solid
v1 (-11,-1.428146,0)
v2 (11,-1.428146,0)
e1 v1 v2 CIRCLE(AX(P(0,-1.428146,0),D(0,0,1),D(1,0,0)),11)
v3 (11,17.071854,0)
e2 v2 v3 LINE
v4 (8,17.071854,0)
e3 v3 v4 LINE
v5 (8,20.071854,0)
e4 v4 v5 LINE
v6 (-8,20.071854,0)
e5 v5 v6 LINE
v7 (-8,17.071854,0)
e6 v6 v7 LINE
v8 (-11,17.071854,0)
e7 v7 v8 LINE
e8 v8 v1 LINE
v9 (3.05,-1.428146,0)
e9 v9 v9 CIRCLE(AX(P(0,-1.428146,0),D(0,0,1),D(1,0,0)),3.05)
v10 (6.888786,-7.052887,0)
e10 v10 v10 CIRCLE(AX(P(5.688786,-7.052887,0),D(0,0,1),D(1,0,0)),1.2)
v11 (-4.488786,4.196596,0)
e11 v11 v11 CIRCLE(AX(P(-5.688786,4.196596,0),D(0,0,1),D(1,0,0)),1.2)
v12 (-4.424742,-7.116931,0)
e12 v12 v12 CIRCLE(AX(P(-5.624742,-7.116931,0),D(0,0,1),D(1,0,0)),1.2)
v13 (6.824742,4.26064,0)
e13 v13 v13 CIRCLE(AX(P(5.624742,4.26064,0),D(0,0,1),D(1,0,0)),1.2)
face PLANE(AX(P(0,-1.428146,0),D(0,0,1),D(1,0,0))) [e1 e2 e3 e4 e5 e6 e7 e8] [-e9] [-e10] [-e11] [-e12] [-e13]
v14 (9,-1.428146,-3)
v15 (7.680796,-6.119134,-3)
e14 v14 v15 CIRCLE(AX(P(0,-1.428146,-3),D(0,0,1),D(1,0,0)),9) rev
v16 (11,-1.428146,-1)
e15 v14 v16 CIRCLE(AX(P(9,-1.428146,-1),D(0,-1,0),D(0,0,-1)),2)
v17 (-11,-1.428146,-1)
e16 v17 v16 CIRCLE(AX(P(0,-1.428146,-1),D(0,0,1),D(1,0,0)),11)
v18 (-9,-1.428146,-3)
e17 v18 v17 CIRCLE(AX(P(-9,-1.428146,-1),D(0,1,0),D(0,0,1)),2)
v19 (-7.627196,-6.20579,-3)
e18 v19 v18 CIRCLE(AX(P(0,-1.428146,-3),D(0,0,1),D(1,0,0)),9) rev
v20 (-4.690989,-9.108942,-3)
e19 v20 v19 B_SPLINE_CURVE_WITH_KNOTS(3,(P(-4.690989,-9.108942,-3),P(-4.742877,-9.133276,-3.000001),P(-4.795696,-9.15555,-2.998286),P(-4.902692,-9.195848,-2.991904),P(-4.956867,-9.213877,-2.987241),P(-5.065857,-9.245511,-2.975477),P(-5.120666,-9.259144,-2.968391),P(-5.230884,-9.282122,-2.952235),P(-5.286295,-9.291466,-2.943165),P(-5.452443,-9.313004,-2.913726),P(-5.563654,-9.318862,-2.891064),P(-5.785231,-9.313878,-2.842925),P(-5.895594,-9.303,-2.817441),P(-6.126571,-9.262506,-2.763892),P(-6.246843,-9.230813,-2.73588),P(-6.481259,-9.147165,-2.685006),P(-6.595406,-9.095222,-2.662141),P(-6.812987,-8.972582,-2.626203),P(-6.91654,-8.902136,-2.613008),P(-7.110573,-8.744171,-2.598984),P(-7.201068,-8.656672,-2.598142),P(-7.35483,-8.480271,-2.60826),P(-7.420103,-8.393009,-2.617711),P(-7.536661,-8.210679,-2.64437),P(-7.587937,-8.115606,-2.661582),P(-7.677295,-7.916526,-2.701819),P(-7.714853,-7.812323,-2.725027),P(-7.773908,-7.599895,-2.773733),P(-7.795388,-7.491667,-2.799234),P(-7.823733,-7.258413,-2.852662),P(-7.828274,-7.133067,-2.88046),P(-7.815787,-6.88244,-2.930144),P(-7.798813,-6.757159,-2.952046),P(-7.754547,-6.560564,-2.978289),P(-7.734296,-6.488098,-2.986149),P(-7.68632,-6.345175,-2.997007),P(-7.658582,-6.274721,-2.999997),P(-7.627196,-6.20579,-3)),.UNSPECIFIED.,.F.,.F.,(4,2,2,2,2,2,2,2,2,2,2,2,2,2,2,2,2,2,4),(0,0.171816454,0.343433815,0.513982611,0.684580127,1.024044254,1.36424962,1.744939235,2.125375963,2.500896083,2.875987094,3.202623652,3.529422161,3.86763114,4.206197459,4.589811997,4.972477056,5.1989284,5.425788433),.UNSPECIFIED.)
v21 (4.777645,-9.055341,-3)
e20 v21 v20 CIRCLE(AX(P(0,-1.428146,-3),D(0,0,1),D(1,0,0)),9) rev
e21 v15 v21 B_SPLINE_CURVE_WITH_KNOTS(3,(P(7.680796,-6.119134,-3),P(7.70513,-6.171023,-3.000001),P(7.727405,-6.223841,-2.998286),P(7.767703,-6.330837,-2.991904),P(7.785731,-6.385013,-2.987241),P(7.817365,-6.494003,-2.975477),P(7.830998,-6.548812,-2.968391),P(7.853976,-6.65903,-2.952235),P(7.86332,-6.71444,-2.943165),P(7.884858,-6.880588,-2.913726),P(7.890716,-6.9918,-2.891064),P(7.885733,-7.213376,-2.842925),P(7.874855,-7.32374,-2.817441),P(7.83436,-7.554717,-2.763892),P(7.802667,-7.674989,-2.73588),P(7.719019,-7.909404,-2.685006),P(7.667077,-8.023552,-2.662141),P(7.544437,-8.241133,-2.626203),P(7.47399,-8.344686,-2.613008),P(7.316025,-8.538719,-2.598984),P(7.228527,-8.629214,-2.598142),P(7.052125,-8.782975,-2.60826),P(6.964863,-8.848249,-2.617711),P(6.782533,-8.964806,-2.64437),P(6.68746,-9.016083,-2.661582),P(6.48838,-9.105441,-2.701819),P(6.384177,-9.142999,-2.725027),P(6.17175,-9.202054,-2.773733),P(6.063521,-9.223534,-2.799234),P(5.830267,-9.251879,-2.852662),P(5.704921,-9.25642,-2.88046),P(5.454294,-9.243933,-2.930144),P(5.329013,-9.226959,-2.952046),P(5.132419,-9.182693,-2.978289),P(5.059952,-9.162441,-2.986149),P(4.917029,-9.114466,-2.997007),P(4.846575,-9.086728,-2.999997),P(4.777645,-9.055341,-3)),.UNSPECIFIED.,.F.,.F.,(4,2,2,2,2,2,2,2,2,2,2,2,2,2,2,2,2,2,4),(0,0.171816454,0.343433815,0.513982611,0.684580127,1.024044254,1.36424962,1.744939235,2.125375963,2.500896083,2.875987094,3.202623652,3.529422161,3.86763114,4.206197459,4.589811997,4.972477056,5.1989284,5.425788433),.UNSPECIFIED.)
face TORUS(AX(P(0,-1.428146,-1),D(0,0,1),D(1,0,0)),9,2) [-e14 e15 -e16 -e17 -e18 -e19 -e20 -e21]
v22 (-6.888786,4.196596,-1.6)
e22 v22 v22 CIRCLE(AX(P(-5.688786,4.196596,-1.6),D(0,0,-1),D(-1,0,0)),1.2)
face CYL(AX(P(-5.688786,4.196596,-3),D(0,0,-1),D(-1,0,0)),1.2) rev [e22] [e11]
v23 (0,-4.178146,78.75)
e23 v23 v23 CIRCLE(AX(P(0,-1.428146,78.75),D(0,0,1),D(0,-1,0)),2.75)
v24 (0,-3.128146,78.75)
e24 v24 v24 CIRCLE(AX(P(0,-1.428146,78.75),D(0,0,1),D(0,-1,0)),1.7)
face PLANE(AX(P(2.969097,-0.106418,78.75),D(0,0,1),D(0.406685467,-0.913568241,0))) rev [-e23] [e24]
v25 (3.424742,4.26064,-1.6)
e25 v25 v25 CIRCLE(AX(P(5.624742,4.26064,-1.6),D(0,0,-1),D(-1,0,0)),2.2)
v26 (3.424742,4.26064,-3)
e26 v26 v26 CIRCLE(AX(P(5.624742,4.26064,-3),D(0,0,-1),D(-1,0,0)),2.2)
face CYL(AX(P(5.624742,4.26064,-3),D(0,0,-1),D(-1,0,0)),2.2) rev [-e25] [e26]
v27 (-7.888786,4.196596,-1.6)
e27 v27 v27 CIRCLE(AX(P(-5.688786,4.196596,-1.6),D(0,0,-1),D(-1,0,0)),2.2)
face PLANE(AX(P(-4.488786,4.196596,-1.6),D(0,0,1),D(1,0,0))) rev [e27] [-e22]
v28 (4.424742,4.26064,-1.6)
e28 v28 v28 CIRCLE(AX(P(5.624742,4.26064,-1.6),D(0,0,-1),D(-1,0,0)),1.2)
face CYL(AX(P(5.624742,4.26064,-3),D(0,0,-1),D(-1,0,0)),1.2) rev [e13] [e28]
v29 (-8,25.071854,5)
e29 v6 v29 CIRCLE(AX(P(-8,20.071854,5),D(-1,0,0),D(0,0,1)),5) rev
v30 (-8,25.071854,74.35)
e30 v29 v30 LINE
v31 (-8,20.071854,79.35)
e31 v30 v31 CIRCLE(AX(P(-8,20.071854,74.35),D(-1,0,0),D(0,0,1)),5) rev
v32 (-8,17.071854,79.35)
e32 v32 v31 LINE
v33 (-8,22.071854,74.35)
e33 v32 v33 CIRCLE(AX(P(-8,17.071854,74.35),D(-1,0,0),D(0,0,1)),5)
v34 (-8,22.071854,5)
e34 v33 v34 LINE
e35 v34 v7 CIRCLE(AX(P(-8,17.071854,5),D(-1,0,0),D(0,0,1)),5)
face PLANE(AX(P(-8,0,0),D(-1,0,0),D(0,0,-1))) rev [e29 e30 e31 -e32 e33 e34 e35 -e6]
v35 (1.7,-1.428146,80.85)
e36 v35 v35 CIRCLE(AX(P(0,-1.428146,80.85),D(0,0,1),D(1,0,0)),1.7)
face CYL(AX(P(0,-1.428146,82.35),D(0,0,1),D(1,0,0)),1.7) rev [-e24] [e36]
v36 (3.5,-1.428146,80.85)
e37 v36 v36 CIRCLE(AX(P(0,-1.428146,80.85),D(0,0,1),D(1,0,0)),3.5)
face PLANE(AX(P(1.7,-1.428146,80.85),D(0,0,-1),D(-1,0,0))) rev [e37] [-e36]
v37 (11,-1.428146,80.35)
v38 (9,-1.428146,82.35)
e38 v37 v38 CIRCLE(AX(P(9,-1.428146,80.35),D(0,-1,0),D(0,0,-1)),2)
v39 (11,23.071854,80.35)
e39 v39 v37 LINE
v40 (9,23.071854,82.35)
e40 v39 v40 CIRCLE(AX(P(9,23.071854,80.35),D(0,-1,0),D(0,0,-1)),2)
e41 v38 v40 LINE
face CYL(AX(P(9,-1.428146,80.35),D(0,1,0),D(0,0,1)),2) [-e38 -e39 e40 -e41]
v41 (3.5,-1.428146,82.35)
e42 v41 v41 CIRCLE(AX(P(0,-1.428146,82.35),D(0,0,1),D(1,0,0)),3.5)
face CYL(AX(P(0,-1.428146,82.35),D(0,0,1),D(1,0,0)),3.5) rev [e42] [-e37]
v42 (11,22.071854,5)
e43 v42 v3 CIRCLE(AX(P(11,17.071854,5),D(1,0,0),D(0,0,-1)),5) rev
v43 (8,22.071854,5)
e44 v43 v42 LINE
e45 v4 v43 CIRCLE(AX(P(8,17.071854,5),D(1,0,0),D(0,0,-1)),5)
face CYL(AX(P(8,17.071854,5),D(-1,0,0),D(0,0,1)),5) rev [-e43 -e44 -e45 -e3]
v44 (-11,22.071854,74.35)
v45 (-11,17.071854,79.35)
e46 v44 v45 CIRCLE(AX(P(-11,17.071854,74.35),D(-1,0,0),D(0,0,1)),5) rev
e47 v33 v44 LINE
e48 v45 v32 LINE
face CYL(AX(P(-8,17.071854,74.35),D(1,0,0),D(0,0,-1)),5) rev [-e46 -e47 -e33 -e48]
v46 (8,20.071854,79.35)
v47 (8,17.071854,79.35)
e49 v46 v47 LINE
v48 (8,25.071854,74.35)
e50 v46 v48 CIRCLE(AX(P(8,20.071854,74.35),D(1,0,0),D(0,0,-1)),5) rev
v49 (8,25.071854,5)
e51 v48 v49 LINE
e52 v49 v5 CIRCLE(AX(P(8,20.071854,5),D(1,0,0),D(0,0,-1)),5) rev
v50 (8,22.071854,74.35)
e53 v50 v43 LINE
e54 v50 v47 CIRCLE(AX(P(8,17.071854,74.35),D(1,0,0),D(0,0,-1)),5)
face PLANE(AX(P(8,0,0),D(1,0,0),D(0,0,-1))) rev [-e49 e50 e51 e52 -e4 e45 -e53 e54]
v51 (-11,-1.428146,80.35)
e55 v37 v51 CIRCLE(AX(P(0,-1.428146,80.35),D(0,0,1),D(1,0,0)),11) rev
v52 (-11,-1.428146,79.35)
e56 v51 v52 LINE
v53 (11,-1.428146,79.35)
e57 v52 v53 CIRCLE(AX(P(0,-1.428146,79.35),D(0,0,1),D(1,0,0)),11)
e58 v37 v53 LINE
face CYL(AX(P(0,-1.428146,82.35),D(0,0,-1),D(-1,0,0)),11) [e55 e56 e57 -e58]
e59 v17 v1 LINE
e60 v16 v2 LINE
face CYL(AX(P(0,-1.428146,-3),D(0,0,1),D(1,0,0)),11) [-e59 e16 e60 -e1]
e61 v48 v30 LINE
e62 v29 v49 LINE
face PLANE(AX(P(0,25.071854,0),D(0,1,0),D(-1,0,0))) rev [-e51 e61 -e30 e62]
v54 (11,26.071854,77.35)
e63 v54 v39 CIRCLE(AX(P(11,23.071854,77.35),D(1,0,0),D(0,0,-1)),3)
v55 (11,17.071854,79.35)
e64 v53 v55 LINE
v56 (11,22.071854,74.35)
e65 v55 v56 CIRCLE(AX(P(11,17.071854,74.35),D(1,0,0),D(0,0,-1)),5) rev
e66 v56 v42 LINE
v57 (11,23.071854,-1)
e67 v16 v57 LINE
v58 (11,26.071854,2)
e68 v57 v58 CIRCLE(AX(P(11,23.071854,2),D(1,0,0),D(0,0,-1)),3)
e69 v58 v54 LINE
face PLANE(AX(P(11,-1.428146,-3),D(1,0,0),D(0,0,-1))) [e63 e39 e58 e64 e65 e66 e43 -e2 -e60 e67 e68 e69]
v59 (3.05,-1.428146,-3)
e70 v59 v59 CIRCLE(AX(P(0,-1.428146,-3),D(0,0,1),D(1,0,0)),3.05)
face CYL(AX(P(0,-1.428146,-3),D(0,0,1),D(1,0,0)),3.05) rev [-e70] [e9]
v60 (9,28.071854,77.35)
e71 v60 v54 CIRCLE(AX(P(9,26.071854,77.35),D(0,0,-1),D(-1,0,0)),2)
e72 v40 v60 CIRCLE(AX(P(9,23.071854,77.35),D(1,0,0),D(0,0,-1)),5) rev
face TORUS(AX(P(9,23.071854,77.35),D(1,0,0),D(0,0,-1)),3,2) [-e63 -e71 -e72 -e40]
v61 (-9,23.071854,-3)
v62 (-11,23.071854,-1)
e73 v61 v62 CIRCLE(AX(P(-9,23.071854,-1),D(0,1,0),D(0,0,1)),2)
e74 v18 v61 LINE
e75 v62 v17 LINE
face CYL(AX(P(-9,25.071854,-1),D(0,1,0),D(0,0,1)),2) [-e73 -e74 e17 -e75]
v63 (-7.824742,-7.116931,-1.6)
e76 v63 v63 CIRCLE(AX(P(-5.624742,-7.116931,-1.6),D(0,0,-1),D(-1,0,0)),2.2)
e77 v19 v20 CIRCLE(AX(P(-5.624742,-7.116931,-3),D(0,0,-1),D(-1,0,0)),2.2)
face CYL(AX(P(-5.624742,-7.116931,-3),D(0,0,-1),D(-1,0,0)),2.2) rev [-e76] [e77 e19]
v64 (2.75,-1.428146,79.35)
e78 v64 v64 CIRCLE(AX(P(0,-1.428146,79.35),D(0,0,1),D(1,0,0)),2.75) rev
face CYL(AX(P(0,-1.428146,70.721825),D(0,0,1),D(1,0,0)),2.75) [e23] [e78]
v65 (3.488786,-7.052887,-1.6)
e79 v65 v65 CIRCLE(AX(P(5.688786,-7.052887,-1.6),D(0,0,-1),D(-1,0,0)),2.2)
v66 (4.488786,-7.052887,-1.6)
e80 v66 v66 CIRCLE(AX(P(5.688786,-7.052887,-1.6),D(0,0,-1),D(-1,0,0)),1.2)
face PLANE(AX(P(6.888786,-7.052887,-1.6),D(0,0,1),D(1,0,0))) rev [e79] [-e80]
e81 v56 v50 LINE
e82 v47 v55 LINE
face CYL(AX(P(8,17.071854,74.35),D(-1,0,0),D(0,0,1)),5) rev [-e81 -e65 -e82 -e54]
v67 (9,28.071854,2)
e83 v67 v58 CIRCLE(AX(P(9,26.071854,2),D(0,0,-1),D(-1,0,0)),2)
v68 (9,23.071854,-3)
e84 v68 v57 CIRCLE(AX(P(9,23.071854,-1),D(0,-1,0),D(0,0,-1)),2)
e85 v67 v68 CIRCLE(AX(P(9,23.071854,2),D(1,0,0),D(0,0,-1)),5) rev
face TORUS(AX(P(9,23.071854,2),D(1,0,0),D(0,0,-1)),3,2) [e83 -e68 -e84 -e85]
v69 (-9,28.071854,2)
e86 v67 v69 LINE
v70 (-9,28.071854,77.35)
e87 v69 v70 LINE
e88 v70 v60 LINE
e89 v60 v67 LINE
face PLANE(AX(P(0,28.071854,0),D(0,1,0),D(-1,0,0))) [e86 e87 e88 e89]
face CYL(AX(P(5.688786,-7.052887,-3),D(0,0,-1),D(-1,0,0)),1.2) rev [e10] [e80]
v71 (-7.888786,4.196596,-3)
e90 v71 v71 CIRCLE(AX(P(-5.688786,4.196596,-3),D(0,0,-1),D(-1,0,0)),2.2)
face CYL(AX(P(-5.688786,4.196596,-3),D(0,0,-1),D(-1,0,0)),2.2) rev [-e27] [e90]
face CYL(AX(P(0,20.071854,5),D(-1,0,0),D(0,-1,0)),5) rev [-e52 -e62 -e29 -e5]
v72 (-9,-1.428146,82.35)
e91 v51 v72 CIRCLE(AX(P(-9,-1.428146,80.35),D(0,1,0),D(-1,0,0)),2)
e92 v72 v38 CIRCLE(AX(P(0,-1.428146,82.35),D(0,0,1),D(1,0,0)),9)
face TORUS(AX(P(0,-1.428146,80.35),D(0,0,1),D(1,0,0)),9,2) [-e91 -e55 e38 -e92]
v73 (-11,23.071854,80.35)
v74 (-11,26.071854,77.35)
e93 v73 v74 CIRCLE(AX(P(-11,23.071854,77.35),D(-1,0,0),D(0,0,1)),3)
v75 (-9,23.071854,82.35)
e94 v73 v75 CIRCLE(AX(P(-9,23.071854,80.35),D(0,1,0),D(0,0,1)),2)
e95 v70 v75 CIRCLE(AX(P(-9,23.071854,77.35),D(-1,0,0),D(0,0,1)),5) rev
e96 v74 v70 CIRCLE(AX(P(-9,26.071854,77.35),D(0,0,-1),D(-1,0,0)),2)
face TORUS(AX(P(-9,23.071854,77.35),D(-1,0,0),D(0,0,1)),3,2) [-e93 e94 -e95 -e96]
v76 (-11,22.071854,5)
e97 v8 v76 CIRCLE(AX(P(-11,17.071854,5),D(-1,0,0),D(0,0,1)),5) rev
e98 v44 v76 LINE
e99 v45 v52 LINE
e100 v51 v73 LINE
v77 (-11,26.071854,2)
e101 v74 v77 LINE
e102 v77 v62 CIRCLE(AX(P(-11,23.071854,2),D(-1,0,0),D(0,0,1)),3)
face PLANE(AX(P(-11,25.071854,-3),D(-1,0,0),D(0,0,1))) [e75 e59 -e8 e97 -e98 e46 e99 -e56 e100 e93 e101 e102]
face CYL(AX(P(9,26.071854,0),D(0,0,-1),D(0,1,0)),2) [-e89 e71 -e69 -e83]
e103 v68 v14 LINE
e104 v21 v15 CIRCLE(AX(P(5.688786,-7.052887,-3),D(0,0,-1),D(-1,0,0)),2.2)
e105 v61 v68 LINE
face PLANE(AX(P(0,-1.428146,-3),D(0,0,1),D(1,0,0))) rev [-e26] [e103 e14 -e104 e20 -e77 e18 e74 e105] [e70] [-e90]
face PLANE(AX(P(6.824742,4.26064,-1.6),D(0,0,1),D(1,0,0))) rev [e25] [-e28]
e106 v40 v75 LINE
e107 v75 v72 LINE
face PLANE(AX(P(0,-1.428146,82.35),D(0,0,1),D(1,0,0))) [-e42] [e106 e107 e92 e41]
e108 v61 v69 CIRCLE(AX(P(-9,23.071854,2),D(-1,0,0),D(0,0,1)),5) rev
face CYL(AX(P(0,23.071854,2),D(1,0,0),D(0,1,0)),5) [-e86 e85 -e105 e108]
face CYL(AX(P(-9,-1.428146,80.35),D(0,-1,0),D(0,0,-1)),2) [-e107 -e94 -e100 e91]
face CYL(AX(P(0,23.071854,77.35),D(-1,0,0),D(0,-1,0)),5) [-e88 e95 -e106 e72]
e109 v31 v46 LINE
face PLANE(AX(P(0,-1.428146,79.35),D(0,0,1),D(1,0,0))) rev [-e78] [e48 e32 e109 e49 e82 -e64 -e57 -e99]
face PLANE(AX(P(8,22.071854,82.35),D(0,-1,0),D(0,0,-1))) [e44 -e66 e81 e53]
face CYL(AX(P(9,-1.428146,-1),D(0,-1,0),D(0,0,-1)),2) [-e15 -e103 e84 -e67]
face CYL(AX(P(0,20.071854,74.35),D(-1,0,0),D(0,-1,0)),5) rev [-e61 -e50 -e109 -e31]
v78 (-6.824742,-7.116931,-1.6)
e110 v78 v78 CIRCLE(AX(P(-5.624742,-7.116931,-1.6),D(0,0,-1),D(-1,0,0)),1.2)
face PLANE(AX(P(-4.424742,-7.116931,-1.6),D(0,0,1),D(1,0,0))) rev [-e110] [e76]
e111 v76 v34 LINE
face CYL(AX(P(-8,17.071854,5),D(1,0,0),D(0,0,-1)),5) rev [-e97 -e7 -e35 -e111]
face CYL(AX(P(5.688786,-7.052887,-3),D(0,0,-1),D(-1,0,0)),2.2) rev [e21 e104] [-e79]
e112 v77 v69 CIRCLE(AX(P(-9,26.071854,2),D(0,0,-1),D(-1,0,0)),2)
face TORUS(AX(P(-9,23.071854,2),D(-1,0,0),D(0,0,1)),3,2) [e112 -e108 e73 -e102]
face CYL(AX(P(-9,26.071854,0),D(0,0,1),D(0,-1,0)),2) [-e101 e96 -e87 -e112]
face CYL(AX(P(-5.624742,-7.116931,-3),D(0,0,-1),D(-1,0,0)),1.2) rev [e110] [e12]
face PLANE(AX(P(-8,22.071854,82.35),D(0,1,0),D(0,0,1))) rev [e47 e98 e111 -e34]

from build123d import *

# Parameters (mm, degrees)
ESBO_O1_R                                            = 3.05
RESSALTO_EXTRUS_O1_DEPTH                             = 3
ESBO_O2_W                                            = 22
ESBO_O2_H                                            = 82.35
RESSALTO_EXTRUS_O2_DEPTH                             = 3
RESSALTO_EXTRUS_O3_START                             = 3
RESSALTO_EXTRUS_O3_DEPTH                             = 3
ESBO_O6_W                                            = 85.35
ESBO_O6_H                                            = 6
RESSALTO_EXTRUS_O5_DEPTH                             = 3
ESBO_O7_R                                            = 2.75
RESSALTO_EXTRUS_O6_DEPTH                             = 0.6
REBAIXO_PARA_PARAFUSO_COM_CABE_A_PANELA_D            = 3.4
REBAIXO_PARA_PARAFUSO_COM_CABE_A_PANELA_CBORE_D      = 7
REBAIXO_PARA_PARAFUSO_COM_CABE_A_PANELA_CBORE_DEPTH  = 1.5
REBAIXO_PARA_PARAFUSO_COM_CABE_A_REDONDA_D           = 2.4
REBAIXO_PARA_PARAFUSO_COM_CABE_A_REDONDA_DEPTH       = 3
REBAIXO_PARA_PARAFUSO_COM_CABE_A_REDONDA_CBORE_D     = 4.4
REBAIXO_PARA_PARAFUSO_COM_CABE_A_REDONDA_CBORE_DEPTH = 1.4
PADR_OCIRCULAR1_COUNT                                = 4
FILETE1_R                                            = 5
FILETE2_R                                            = 5
FILETE3_R                                            = 2


with BuildPart() as part:
    # Esboço1 → Ressalto-extrusão1 (new body)
    with BuildSketch(Plane.XY):
        with BuildLine():
            Line((11, -1.428145739), (11, 25.071854261))
            Line((11, 25.071854261), (-11, 25.071854261))
            Line((-11, 25.071854261), (-11, -1.428145739))
            ThreePointArc((-11, -1.428145739), (0, -12.428145739), (11, -1.428145739))
        make_face()
        with Locations((0, -1.428145739)):
            Circle(ESBO_O1_R, mode=Mode.SUBTRACT)
    extrude(amount=-RESSALTO_EXTRUS_O1_DEPTH)

    # Esboço2 → Ressalto-extrusão2 (add)
    with BuildSketch(Plane(origin=(0, 25.071854261, 0), x_dir=(1, 0, 0), z_dir=(0, 1, 0))):
        with Locations((0, -38.175)):
            Rectangle(ESBO_O2_W, ESBO_O2_H)
    extrude(amount=RESSALTO_EXTRUS_O2_DEPTH)

    # Esboço3 → Ressalto-extrusão3 (add)
    with BuildSketch(Plane.XY.offset(79.35).offset(RESSALTO_EXTRUS_O3_START)):
        with BuildLine():
            Line((11, 28.071854261), (-11, 28.071854261))
            Line((-11, 28.071854261), (-11, -1.428145739))
            ThreePointArc((-11, -1.428145739), (0, -12.428145739), (11, -1.428145739))
            Line((11, -1.428145739), (11, 28.071854261))
        make_face()
    extrude(amount=-RESSALTO_EXTRUS_O3_DEPTH)

    # Esboço6 → Ressalto-extrusão5 (add)
    with BuildSketch(Plane(origin=(11, 0, 0), x_dir=(0, 0, -1), z_dir=(1, 0, 0))):
        with Locations((-39.675, 25.071854261)):
            Rectangle(ESBO_O6_W, ESBO_O6_H)
    ressalto_extrus_o5 = extrude(amount=-RESSALTO_EXTRUS_O5_DEPTH)

    # Espelhar1: Ressalto-extrusão5 across plane
    add(ressalto_extrus_o5.mirror(Plane(origin=(0, 0, 0), x_dir=(0, 0, 1), z_dir=(1, 0, 0))))

    # Esboço7 → Ressalto-extrusão6 (add)
    with BuildSketch(Plane(origin=(0, 0, 79.35), x_dir=(-1, 0, 0), z_dir=(0, 0, -1))):
        with Locations(Location((0, -1.428145739, 0), (0, 0, 180))):
            Circle(ESBO_O7_R)
    extrude(amount=RESSALTO_EXTRUS_O6_DEPTH)

    # Rebaixo para parafuso com cabeça panela de M31 (through all)
    with Locations(Plane.XY.offset(82.35)):
        with Locations((0, -1.428145739)):
            CounterBoreHole(REBAIXO_PARA_PARAFUSO_COM_CABE_A_PANELA_D / 2, REBAIXO_PARA_PARAFUSO_COM_CABE_A_PANELA_CBORE_D / 2, REBAIXO_PARA_PARAFUSO_COM_CABE_A_PANELA_CBORE_DEPTH)

    # Rebaixo para parafuso com cabeça redonda de M21
    with Locations(Plane(origin=(0, 0, -3), x_dir=(-1, 0, 0), z_dir=(0, 0, -1))):
        with Locations((-5.624741587, 4.260639903)):
            rebaixo_para_parafuso_com_cabe_a_redonda = CounterBoreHole(REBAIXO_PARA_PARAFUSO_COM_CABE_A_REDONDA_D / 2, REBAIXO_PARA_PARAFUSO_COM_CABE_A_REDONDA_CBORE_D / 2, REBAIXO_PARA_PARAFUSO_COM_CABE_A_REDONDA_CBORE_DEPTH, depth=REBAIXO_PARA_PARAFUSO_COM_CABE_A_REDONDA_DEPTH)

    # PadrãoCircular1: Rebaixo para parafuso com cabeça redonda de M21 ×4 about axis
    padr_ocircular1_axis = Axis((0, -1.428145739, 0), (0, 0, 1))
    for i in range(1, PADR_OCIRCULAR1_COUNT):
        add(rebaixo_para_parafuso_com_cabe_a_redonda.rotate(padr_ocircular1_axis, i * 360 / PADR_OCIRCULAR1_COUNT), mode=Mode.SUBTRACT)

    # Filete1
    filete1_edges = [part.edges().sort_by_distance(p)[0] for p in [
        (0, 25.071854261, 0),
        (0, 25.071854261, 79.35),
        (0, 28.071854261, -3),
        (0, 28.071854261, 82.35),
    ]]
    fillet(filete1_edges, radius=FILETE1_R)

    # Filete2
    # the kernel refuses this fillet: 5 mm, written as the material it adds along each edge
    with BuildSketch(Plane(origin=(11, 22.071854261, 0.417424305), x_dir=(0, -0.9965332502141475, -0.0831954398848114), z_dir=(-1, 0, 0)), Plane(origin=(-11, 22.071854261, 78.932575695), x_dir=(0, -0.9965332502141476, 0.0831954398848087), z_dir=(1, 0, 0))) as filete2_piece_1:
        with BuildLine():
            CenterArc((4.60141685, 4.982666251), FILETE2_R, 184.772263604, 90)
            Line((-0.381249401, 4.566689052), (-0.879516026, 4.525091332))
            Line((-0.879516026, 4.525091332), (-0.498266625, -0.04159772))
            Line((-0.498266625, -0.04159772), (-0.16118171, -0.473307993))
            ThreePointArc((-0.16118171, -0.473307993), (2.069392019, -0.747852945), (5.05899177, -0.498266625))
            Line((5.05899177, -0.498266625), (5.01739405, 0))
        make_face()
    extrude(amount=3)
    with BuildSketch(Plane(origin=(-11, 22.071854261, 0.417424305), x_dir=(0, -0.9965332502141475, -0.08319543988481146), z_dir=(1, 0, 0))) as filete2_piece_2:
        with BuildLine():
            CenterArc((4.60141685, -4.982666251), FILETE2_R, 85.227736396, 90)
            Line((-0.381249401, -4.566689052), (-0.879516026, -4.525091332))
            Line((-0.879516026, -4.525091332), (-0.498266625, 0.04159772))
            Line((-0.498266625, 0.04159772), (-0.16118171, 0.473307993))
            ThreePointArc((-0.16118171, 0.473307993), (2.069392019, 0.747852945), (5.05899177, 0.498266625))
            Line((5.05899177, 0.498266625), (5.01739405, 0))
        make_face()
    extrude(amount=3)
    with BuildSketch(Plane(origin=(11, 22.071854261, 78.932575695), x_dir=(0, 0, -1), z_dir=(-1, 0, 0))) as filete2_piece_3:
        with BuildLine():
            CenterArc((4.582575695, 5), FILETE2_R, 180, 90)
            Line((-0.417424305, 5), (-0.917424305, 5))
            ThreePointArc((-0.917424305, 5), (-0.917424305, 2), (-0.458257569, -0.2))
            Line((-0.458257569, -0.2), (0, -0.5))
            Line((0, -0.5), (4.582575695, -0.5))
            Line((4.582575695, -0.5), (4.582575695, 0))
        make_face()
    extrude(amount=3)

    # Filete3
    # the kernel refuses this fillet: 2 mm, written as the material it takes off along each edge
    with BuildSketch(Plane(origin=(-11, 28.071854261, 2), x_dir=(1, 0, 0), z_dir=(0, 0, 1))) as filete3_piece_1:
        with BuildLine():
            CenterArc((FILETE3_R, -FILETE3_R), FILETE3_R, 90, 90)
            Line((0, -FILETE3_R), (0, 0))
            Line((0, 0), (FILETE3_R, 0))
        make_face()
    extrude(amount=75.35, mode=Mode.SUBTRACT)
    with BuildSketch(Plane(origin=(11, 28.071854261, 2), x_dir=(-1, 0, 0), z_dir=(0, 0, 1))) as filete3_piece_2:
        with BuildLine():
            CenterArc((FILETE3_R, FILETE3_R), FILETE3_R, 180, 90)
            Line((0, FILETE3_R), (0, 0))
            Line((0, 0), (FILETE3_R, 0))
        make_face()
    extrude(amount=75.35, mode=Mode.SUBTRACT)
    with BuildSketch(Plane(origin=(-11, -1.428145739, -3), x_dir=(1, 0, 0), z_dir=(0, 1, 0)), Plane(origin=(-11, 23.071854261, 82.35), x_dir=(1, 0, 0), z_dir=(0, -1, 0))) as filete3_piece_3:
        with BuildLine():
            CenterArc((FILETE3_R, -FILETE3_R), FILETE3_R, 90, 90)
            Line((0, -FILETE3_R), (0, 0))
            Line((0, 0), (FILETE3_R, 0))
        make_face()
    extrude(amount=24.5, mode=Mode.SUBTRACT)
    with BuildSketch(Plane(origin=(-11, 23.071854261, 77.35), x_dir=(0, 1, 0), z_dir=(0, 0, -1))) as filete3_piece_4:
        with BuildLine():
            CenterArc((5 - FILETE3_R, FILETE3_R), FILETE3_R, 270, 90)
            Line((5 - FILETE3_R, 0), (5, 0))
            Line((5, 0), (5, FILETE3_R))
        make_face()
    revolve(axis=Axis((-11, 23.071854261, 77.35), (1, 0, 0)), revolution_arc=90, mode=Mode.SUBTRACT)
    with BuildSketch(Plane(origin=(-11, 23.071854261, 2), x_dir=(0, 0, -1), z_dir=(0, -1, 0))) as filete3_piece_5:
        with BuildLine():
            CenterArc((5 - FILETE3_R, FILETE3_R), FILETE3_R, 270, 90)
            Line((5 - FILETE3_R, 0), (5, 0))
            Line((5, 0), (5, FILETE3_R))
        make_face()
    revolve(axis=Axis((-11, 23.071854261, 2), (1, 0, 0)), revolution_arc=90, mode=Mode.SUBTRACT)
    with BuildSketch(Plane(origin=(11, 23.071854261, 77.35), x_dir=(0, 1, 0), z_dir=(0, 0, -1))) as filete3_piece_6:
        with BuildLine():
            CenterArc((5 - FILETE3_R, -FILETE3_R), FILETE3_R, 0, 90)
            Line((5 - FILETE3_R, 0), (5, 0))
            Line((5, 0), (5, -FILETE3_R))
        make_face()
    revolve(axis=Axis((11, 23.071854261, 77.35), (1, 0, 0)), revolution_arc=90, mode=Mode.SUBTRACT)
    with BuildSketch(Plane(origin=(11, 23.071854261, 2), x_dir=(0, 0, -1), z_dir=(0, -1, 0))) as filete3_piece_7:
        with BuildLine():
            CenterArc((5 - FILETE3_R, -FILETE3_R), FILETE3_R, 0, 90)
            Line((5 - FILETE3_R, 0), (5, 0))
            Line((5, 0), (5, -FILETE3_R))
        make_face()
    revolve(axis=Axis((11, 23.071854261, 2), (1, 0, 0)), revolution_arc=90, mode=Mode.SUBTRACT)
    with BuildSketch(Plane(origin=(11, 23.071854261, 82.35), x_dir=(-1, 0, 0), z_dir=(0, -1, 0)), Plane(origin=(11, -1.428145739, -3), x_dir=(-1, 0, 0), z_dir=(0, 1, 0))) as filete3_piece_8:
        with BuildLine():
            CenterArc((FILETE3_R, FILETE3_R), FILETE3_R, 180, 90)
            Line((0, FILETE3_R), (0, 0))
            Line((0, 0), (FILETE3_R, 0))
        make_face()
    extrude(amount=24.5, mode=Mode.SUBTRACT)
    with BuildSketch(Plane(origin=(0, -1.428145739, 82.35), x_dir=(-1, 0, 0), z_dir=(0, 1, 0))) as filete3_piece_9:
        with BuildLine():
            CenterArc((11 - FILETE3_R, -FILETE3_R), FILETE3_R, 0, 90)
            Line((11, -FILETE3_R), (11, 0))
            Line((11, 0), (11 - FILETE3_R, 0))
        make_face()
    revolve(axis=Axis((0, -1.428145739, 82.35), (0, 0, 1)), revolution_arc=180, mode=Mode.SUBTRACT)
    with BuildSketch(Plane(origin=(0, -1.428145739, -3), x_dir=(-1, 0, 0), z_dir=(0, 1, 0))) as filete3_piece_10:
        with BuildLine():
            CenterArc((11 - FILETE3_R, FILETE3_R), FILETE3_R, 270, 90)
            Line((11, FILETE3_R), (11, 0))
            Line((11, 0), (11 - FILETE3_R, 0))
        make_face()
    revolve(axis=Axis((0, -1.428145739, -3), (0, 0, 1)), revolution_arc=180, mode=Mode.SUBTRACT)


solid = part.part
